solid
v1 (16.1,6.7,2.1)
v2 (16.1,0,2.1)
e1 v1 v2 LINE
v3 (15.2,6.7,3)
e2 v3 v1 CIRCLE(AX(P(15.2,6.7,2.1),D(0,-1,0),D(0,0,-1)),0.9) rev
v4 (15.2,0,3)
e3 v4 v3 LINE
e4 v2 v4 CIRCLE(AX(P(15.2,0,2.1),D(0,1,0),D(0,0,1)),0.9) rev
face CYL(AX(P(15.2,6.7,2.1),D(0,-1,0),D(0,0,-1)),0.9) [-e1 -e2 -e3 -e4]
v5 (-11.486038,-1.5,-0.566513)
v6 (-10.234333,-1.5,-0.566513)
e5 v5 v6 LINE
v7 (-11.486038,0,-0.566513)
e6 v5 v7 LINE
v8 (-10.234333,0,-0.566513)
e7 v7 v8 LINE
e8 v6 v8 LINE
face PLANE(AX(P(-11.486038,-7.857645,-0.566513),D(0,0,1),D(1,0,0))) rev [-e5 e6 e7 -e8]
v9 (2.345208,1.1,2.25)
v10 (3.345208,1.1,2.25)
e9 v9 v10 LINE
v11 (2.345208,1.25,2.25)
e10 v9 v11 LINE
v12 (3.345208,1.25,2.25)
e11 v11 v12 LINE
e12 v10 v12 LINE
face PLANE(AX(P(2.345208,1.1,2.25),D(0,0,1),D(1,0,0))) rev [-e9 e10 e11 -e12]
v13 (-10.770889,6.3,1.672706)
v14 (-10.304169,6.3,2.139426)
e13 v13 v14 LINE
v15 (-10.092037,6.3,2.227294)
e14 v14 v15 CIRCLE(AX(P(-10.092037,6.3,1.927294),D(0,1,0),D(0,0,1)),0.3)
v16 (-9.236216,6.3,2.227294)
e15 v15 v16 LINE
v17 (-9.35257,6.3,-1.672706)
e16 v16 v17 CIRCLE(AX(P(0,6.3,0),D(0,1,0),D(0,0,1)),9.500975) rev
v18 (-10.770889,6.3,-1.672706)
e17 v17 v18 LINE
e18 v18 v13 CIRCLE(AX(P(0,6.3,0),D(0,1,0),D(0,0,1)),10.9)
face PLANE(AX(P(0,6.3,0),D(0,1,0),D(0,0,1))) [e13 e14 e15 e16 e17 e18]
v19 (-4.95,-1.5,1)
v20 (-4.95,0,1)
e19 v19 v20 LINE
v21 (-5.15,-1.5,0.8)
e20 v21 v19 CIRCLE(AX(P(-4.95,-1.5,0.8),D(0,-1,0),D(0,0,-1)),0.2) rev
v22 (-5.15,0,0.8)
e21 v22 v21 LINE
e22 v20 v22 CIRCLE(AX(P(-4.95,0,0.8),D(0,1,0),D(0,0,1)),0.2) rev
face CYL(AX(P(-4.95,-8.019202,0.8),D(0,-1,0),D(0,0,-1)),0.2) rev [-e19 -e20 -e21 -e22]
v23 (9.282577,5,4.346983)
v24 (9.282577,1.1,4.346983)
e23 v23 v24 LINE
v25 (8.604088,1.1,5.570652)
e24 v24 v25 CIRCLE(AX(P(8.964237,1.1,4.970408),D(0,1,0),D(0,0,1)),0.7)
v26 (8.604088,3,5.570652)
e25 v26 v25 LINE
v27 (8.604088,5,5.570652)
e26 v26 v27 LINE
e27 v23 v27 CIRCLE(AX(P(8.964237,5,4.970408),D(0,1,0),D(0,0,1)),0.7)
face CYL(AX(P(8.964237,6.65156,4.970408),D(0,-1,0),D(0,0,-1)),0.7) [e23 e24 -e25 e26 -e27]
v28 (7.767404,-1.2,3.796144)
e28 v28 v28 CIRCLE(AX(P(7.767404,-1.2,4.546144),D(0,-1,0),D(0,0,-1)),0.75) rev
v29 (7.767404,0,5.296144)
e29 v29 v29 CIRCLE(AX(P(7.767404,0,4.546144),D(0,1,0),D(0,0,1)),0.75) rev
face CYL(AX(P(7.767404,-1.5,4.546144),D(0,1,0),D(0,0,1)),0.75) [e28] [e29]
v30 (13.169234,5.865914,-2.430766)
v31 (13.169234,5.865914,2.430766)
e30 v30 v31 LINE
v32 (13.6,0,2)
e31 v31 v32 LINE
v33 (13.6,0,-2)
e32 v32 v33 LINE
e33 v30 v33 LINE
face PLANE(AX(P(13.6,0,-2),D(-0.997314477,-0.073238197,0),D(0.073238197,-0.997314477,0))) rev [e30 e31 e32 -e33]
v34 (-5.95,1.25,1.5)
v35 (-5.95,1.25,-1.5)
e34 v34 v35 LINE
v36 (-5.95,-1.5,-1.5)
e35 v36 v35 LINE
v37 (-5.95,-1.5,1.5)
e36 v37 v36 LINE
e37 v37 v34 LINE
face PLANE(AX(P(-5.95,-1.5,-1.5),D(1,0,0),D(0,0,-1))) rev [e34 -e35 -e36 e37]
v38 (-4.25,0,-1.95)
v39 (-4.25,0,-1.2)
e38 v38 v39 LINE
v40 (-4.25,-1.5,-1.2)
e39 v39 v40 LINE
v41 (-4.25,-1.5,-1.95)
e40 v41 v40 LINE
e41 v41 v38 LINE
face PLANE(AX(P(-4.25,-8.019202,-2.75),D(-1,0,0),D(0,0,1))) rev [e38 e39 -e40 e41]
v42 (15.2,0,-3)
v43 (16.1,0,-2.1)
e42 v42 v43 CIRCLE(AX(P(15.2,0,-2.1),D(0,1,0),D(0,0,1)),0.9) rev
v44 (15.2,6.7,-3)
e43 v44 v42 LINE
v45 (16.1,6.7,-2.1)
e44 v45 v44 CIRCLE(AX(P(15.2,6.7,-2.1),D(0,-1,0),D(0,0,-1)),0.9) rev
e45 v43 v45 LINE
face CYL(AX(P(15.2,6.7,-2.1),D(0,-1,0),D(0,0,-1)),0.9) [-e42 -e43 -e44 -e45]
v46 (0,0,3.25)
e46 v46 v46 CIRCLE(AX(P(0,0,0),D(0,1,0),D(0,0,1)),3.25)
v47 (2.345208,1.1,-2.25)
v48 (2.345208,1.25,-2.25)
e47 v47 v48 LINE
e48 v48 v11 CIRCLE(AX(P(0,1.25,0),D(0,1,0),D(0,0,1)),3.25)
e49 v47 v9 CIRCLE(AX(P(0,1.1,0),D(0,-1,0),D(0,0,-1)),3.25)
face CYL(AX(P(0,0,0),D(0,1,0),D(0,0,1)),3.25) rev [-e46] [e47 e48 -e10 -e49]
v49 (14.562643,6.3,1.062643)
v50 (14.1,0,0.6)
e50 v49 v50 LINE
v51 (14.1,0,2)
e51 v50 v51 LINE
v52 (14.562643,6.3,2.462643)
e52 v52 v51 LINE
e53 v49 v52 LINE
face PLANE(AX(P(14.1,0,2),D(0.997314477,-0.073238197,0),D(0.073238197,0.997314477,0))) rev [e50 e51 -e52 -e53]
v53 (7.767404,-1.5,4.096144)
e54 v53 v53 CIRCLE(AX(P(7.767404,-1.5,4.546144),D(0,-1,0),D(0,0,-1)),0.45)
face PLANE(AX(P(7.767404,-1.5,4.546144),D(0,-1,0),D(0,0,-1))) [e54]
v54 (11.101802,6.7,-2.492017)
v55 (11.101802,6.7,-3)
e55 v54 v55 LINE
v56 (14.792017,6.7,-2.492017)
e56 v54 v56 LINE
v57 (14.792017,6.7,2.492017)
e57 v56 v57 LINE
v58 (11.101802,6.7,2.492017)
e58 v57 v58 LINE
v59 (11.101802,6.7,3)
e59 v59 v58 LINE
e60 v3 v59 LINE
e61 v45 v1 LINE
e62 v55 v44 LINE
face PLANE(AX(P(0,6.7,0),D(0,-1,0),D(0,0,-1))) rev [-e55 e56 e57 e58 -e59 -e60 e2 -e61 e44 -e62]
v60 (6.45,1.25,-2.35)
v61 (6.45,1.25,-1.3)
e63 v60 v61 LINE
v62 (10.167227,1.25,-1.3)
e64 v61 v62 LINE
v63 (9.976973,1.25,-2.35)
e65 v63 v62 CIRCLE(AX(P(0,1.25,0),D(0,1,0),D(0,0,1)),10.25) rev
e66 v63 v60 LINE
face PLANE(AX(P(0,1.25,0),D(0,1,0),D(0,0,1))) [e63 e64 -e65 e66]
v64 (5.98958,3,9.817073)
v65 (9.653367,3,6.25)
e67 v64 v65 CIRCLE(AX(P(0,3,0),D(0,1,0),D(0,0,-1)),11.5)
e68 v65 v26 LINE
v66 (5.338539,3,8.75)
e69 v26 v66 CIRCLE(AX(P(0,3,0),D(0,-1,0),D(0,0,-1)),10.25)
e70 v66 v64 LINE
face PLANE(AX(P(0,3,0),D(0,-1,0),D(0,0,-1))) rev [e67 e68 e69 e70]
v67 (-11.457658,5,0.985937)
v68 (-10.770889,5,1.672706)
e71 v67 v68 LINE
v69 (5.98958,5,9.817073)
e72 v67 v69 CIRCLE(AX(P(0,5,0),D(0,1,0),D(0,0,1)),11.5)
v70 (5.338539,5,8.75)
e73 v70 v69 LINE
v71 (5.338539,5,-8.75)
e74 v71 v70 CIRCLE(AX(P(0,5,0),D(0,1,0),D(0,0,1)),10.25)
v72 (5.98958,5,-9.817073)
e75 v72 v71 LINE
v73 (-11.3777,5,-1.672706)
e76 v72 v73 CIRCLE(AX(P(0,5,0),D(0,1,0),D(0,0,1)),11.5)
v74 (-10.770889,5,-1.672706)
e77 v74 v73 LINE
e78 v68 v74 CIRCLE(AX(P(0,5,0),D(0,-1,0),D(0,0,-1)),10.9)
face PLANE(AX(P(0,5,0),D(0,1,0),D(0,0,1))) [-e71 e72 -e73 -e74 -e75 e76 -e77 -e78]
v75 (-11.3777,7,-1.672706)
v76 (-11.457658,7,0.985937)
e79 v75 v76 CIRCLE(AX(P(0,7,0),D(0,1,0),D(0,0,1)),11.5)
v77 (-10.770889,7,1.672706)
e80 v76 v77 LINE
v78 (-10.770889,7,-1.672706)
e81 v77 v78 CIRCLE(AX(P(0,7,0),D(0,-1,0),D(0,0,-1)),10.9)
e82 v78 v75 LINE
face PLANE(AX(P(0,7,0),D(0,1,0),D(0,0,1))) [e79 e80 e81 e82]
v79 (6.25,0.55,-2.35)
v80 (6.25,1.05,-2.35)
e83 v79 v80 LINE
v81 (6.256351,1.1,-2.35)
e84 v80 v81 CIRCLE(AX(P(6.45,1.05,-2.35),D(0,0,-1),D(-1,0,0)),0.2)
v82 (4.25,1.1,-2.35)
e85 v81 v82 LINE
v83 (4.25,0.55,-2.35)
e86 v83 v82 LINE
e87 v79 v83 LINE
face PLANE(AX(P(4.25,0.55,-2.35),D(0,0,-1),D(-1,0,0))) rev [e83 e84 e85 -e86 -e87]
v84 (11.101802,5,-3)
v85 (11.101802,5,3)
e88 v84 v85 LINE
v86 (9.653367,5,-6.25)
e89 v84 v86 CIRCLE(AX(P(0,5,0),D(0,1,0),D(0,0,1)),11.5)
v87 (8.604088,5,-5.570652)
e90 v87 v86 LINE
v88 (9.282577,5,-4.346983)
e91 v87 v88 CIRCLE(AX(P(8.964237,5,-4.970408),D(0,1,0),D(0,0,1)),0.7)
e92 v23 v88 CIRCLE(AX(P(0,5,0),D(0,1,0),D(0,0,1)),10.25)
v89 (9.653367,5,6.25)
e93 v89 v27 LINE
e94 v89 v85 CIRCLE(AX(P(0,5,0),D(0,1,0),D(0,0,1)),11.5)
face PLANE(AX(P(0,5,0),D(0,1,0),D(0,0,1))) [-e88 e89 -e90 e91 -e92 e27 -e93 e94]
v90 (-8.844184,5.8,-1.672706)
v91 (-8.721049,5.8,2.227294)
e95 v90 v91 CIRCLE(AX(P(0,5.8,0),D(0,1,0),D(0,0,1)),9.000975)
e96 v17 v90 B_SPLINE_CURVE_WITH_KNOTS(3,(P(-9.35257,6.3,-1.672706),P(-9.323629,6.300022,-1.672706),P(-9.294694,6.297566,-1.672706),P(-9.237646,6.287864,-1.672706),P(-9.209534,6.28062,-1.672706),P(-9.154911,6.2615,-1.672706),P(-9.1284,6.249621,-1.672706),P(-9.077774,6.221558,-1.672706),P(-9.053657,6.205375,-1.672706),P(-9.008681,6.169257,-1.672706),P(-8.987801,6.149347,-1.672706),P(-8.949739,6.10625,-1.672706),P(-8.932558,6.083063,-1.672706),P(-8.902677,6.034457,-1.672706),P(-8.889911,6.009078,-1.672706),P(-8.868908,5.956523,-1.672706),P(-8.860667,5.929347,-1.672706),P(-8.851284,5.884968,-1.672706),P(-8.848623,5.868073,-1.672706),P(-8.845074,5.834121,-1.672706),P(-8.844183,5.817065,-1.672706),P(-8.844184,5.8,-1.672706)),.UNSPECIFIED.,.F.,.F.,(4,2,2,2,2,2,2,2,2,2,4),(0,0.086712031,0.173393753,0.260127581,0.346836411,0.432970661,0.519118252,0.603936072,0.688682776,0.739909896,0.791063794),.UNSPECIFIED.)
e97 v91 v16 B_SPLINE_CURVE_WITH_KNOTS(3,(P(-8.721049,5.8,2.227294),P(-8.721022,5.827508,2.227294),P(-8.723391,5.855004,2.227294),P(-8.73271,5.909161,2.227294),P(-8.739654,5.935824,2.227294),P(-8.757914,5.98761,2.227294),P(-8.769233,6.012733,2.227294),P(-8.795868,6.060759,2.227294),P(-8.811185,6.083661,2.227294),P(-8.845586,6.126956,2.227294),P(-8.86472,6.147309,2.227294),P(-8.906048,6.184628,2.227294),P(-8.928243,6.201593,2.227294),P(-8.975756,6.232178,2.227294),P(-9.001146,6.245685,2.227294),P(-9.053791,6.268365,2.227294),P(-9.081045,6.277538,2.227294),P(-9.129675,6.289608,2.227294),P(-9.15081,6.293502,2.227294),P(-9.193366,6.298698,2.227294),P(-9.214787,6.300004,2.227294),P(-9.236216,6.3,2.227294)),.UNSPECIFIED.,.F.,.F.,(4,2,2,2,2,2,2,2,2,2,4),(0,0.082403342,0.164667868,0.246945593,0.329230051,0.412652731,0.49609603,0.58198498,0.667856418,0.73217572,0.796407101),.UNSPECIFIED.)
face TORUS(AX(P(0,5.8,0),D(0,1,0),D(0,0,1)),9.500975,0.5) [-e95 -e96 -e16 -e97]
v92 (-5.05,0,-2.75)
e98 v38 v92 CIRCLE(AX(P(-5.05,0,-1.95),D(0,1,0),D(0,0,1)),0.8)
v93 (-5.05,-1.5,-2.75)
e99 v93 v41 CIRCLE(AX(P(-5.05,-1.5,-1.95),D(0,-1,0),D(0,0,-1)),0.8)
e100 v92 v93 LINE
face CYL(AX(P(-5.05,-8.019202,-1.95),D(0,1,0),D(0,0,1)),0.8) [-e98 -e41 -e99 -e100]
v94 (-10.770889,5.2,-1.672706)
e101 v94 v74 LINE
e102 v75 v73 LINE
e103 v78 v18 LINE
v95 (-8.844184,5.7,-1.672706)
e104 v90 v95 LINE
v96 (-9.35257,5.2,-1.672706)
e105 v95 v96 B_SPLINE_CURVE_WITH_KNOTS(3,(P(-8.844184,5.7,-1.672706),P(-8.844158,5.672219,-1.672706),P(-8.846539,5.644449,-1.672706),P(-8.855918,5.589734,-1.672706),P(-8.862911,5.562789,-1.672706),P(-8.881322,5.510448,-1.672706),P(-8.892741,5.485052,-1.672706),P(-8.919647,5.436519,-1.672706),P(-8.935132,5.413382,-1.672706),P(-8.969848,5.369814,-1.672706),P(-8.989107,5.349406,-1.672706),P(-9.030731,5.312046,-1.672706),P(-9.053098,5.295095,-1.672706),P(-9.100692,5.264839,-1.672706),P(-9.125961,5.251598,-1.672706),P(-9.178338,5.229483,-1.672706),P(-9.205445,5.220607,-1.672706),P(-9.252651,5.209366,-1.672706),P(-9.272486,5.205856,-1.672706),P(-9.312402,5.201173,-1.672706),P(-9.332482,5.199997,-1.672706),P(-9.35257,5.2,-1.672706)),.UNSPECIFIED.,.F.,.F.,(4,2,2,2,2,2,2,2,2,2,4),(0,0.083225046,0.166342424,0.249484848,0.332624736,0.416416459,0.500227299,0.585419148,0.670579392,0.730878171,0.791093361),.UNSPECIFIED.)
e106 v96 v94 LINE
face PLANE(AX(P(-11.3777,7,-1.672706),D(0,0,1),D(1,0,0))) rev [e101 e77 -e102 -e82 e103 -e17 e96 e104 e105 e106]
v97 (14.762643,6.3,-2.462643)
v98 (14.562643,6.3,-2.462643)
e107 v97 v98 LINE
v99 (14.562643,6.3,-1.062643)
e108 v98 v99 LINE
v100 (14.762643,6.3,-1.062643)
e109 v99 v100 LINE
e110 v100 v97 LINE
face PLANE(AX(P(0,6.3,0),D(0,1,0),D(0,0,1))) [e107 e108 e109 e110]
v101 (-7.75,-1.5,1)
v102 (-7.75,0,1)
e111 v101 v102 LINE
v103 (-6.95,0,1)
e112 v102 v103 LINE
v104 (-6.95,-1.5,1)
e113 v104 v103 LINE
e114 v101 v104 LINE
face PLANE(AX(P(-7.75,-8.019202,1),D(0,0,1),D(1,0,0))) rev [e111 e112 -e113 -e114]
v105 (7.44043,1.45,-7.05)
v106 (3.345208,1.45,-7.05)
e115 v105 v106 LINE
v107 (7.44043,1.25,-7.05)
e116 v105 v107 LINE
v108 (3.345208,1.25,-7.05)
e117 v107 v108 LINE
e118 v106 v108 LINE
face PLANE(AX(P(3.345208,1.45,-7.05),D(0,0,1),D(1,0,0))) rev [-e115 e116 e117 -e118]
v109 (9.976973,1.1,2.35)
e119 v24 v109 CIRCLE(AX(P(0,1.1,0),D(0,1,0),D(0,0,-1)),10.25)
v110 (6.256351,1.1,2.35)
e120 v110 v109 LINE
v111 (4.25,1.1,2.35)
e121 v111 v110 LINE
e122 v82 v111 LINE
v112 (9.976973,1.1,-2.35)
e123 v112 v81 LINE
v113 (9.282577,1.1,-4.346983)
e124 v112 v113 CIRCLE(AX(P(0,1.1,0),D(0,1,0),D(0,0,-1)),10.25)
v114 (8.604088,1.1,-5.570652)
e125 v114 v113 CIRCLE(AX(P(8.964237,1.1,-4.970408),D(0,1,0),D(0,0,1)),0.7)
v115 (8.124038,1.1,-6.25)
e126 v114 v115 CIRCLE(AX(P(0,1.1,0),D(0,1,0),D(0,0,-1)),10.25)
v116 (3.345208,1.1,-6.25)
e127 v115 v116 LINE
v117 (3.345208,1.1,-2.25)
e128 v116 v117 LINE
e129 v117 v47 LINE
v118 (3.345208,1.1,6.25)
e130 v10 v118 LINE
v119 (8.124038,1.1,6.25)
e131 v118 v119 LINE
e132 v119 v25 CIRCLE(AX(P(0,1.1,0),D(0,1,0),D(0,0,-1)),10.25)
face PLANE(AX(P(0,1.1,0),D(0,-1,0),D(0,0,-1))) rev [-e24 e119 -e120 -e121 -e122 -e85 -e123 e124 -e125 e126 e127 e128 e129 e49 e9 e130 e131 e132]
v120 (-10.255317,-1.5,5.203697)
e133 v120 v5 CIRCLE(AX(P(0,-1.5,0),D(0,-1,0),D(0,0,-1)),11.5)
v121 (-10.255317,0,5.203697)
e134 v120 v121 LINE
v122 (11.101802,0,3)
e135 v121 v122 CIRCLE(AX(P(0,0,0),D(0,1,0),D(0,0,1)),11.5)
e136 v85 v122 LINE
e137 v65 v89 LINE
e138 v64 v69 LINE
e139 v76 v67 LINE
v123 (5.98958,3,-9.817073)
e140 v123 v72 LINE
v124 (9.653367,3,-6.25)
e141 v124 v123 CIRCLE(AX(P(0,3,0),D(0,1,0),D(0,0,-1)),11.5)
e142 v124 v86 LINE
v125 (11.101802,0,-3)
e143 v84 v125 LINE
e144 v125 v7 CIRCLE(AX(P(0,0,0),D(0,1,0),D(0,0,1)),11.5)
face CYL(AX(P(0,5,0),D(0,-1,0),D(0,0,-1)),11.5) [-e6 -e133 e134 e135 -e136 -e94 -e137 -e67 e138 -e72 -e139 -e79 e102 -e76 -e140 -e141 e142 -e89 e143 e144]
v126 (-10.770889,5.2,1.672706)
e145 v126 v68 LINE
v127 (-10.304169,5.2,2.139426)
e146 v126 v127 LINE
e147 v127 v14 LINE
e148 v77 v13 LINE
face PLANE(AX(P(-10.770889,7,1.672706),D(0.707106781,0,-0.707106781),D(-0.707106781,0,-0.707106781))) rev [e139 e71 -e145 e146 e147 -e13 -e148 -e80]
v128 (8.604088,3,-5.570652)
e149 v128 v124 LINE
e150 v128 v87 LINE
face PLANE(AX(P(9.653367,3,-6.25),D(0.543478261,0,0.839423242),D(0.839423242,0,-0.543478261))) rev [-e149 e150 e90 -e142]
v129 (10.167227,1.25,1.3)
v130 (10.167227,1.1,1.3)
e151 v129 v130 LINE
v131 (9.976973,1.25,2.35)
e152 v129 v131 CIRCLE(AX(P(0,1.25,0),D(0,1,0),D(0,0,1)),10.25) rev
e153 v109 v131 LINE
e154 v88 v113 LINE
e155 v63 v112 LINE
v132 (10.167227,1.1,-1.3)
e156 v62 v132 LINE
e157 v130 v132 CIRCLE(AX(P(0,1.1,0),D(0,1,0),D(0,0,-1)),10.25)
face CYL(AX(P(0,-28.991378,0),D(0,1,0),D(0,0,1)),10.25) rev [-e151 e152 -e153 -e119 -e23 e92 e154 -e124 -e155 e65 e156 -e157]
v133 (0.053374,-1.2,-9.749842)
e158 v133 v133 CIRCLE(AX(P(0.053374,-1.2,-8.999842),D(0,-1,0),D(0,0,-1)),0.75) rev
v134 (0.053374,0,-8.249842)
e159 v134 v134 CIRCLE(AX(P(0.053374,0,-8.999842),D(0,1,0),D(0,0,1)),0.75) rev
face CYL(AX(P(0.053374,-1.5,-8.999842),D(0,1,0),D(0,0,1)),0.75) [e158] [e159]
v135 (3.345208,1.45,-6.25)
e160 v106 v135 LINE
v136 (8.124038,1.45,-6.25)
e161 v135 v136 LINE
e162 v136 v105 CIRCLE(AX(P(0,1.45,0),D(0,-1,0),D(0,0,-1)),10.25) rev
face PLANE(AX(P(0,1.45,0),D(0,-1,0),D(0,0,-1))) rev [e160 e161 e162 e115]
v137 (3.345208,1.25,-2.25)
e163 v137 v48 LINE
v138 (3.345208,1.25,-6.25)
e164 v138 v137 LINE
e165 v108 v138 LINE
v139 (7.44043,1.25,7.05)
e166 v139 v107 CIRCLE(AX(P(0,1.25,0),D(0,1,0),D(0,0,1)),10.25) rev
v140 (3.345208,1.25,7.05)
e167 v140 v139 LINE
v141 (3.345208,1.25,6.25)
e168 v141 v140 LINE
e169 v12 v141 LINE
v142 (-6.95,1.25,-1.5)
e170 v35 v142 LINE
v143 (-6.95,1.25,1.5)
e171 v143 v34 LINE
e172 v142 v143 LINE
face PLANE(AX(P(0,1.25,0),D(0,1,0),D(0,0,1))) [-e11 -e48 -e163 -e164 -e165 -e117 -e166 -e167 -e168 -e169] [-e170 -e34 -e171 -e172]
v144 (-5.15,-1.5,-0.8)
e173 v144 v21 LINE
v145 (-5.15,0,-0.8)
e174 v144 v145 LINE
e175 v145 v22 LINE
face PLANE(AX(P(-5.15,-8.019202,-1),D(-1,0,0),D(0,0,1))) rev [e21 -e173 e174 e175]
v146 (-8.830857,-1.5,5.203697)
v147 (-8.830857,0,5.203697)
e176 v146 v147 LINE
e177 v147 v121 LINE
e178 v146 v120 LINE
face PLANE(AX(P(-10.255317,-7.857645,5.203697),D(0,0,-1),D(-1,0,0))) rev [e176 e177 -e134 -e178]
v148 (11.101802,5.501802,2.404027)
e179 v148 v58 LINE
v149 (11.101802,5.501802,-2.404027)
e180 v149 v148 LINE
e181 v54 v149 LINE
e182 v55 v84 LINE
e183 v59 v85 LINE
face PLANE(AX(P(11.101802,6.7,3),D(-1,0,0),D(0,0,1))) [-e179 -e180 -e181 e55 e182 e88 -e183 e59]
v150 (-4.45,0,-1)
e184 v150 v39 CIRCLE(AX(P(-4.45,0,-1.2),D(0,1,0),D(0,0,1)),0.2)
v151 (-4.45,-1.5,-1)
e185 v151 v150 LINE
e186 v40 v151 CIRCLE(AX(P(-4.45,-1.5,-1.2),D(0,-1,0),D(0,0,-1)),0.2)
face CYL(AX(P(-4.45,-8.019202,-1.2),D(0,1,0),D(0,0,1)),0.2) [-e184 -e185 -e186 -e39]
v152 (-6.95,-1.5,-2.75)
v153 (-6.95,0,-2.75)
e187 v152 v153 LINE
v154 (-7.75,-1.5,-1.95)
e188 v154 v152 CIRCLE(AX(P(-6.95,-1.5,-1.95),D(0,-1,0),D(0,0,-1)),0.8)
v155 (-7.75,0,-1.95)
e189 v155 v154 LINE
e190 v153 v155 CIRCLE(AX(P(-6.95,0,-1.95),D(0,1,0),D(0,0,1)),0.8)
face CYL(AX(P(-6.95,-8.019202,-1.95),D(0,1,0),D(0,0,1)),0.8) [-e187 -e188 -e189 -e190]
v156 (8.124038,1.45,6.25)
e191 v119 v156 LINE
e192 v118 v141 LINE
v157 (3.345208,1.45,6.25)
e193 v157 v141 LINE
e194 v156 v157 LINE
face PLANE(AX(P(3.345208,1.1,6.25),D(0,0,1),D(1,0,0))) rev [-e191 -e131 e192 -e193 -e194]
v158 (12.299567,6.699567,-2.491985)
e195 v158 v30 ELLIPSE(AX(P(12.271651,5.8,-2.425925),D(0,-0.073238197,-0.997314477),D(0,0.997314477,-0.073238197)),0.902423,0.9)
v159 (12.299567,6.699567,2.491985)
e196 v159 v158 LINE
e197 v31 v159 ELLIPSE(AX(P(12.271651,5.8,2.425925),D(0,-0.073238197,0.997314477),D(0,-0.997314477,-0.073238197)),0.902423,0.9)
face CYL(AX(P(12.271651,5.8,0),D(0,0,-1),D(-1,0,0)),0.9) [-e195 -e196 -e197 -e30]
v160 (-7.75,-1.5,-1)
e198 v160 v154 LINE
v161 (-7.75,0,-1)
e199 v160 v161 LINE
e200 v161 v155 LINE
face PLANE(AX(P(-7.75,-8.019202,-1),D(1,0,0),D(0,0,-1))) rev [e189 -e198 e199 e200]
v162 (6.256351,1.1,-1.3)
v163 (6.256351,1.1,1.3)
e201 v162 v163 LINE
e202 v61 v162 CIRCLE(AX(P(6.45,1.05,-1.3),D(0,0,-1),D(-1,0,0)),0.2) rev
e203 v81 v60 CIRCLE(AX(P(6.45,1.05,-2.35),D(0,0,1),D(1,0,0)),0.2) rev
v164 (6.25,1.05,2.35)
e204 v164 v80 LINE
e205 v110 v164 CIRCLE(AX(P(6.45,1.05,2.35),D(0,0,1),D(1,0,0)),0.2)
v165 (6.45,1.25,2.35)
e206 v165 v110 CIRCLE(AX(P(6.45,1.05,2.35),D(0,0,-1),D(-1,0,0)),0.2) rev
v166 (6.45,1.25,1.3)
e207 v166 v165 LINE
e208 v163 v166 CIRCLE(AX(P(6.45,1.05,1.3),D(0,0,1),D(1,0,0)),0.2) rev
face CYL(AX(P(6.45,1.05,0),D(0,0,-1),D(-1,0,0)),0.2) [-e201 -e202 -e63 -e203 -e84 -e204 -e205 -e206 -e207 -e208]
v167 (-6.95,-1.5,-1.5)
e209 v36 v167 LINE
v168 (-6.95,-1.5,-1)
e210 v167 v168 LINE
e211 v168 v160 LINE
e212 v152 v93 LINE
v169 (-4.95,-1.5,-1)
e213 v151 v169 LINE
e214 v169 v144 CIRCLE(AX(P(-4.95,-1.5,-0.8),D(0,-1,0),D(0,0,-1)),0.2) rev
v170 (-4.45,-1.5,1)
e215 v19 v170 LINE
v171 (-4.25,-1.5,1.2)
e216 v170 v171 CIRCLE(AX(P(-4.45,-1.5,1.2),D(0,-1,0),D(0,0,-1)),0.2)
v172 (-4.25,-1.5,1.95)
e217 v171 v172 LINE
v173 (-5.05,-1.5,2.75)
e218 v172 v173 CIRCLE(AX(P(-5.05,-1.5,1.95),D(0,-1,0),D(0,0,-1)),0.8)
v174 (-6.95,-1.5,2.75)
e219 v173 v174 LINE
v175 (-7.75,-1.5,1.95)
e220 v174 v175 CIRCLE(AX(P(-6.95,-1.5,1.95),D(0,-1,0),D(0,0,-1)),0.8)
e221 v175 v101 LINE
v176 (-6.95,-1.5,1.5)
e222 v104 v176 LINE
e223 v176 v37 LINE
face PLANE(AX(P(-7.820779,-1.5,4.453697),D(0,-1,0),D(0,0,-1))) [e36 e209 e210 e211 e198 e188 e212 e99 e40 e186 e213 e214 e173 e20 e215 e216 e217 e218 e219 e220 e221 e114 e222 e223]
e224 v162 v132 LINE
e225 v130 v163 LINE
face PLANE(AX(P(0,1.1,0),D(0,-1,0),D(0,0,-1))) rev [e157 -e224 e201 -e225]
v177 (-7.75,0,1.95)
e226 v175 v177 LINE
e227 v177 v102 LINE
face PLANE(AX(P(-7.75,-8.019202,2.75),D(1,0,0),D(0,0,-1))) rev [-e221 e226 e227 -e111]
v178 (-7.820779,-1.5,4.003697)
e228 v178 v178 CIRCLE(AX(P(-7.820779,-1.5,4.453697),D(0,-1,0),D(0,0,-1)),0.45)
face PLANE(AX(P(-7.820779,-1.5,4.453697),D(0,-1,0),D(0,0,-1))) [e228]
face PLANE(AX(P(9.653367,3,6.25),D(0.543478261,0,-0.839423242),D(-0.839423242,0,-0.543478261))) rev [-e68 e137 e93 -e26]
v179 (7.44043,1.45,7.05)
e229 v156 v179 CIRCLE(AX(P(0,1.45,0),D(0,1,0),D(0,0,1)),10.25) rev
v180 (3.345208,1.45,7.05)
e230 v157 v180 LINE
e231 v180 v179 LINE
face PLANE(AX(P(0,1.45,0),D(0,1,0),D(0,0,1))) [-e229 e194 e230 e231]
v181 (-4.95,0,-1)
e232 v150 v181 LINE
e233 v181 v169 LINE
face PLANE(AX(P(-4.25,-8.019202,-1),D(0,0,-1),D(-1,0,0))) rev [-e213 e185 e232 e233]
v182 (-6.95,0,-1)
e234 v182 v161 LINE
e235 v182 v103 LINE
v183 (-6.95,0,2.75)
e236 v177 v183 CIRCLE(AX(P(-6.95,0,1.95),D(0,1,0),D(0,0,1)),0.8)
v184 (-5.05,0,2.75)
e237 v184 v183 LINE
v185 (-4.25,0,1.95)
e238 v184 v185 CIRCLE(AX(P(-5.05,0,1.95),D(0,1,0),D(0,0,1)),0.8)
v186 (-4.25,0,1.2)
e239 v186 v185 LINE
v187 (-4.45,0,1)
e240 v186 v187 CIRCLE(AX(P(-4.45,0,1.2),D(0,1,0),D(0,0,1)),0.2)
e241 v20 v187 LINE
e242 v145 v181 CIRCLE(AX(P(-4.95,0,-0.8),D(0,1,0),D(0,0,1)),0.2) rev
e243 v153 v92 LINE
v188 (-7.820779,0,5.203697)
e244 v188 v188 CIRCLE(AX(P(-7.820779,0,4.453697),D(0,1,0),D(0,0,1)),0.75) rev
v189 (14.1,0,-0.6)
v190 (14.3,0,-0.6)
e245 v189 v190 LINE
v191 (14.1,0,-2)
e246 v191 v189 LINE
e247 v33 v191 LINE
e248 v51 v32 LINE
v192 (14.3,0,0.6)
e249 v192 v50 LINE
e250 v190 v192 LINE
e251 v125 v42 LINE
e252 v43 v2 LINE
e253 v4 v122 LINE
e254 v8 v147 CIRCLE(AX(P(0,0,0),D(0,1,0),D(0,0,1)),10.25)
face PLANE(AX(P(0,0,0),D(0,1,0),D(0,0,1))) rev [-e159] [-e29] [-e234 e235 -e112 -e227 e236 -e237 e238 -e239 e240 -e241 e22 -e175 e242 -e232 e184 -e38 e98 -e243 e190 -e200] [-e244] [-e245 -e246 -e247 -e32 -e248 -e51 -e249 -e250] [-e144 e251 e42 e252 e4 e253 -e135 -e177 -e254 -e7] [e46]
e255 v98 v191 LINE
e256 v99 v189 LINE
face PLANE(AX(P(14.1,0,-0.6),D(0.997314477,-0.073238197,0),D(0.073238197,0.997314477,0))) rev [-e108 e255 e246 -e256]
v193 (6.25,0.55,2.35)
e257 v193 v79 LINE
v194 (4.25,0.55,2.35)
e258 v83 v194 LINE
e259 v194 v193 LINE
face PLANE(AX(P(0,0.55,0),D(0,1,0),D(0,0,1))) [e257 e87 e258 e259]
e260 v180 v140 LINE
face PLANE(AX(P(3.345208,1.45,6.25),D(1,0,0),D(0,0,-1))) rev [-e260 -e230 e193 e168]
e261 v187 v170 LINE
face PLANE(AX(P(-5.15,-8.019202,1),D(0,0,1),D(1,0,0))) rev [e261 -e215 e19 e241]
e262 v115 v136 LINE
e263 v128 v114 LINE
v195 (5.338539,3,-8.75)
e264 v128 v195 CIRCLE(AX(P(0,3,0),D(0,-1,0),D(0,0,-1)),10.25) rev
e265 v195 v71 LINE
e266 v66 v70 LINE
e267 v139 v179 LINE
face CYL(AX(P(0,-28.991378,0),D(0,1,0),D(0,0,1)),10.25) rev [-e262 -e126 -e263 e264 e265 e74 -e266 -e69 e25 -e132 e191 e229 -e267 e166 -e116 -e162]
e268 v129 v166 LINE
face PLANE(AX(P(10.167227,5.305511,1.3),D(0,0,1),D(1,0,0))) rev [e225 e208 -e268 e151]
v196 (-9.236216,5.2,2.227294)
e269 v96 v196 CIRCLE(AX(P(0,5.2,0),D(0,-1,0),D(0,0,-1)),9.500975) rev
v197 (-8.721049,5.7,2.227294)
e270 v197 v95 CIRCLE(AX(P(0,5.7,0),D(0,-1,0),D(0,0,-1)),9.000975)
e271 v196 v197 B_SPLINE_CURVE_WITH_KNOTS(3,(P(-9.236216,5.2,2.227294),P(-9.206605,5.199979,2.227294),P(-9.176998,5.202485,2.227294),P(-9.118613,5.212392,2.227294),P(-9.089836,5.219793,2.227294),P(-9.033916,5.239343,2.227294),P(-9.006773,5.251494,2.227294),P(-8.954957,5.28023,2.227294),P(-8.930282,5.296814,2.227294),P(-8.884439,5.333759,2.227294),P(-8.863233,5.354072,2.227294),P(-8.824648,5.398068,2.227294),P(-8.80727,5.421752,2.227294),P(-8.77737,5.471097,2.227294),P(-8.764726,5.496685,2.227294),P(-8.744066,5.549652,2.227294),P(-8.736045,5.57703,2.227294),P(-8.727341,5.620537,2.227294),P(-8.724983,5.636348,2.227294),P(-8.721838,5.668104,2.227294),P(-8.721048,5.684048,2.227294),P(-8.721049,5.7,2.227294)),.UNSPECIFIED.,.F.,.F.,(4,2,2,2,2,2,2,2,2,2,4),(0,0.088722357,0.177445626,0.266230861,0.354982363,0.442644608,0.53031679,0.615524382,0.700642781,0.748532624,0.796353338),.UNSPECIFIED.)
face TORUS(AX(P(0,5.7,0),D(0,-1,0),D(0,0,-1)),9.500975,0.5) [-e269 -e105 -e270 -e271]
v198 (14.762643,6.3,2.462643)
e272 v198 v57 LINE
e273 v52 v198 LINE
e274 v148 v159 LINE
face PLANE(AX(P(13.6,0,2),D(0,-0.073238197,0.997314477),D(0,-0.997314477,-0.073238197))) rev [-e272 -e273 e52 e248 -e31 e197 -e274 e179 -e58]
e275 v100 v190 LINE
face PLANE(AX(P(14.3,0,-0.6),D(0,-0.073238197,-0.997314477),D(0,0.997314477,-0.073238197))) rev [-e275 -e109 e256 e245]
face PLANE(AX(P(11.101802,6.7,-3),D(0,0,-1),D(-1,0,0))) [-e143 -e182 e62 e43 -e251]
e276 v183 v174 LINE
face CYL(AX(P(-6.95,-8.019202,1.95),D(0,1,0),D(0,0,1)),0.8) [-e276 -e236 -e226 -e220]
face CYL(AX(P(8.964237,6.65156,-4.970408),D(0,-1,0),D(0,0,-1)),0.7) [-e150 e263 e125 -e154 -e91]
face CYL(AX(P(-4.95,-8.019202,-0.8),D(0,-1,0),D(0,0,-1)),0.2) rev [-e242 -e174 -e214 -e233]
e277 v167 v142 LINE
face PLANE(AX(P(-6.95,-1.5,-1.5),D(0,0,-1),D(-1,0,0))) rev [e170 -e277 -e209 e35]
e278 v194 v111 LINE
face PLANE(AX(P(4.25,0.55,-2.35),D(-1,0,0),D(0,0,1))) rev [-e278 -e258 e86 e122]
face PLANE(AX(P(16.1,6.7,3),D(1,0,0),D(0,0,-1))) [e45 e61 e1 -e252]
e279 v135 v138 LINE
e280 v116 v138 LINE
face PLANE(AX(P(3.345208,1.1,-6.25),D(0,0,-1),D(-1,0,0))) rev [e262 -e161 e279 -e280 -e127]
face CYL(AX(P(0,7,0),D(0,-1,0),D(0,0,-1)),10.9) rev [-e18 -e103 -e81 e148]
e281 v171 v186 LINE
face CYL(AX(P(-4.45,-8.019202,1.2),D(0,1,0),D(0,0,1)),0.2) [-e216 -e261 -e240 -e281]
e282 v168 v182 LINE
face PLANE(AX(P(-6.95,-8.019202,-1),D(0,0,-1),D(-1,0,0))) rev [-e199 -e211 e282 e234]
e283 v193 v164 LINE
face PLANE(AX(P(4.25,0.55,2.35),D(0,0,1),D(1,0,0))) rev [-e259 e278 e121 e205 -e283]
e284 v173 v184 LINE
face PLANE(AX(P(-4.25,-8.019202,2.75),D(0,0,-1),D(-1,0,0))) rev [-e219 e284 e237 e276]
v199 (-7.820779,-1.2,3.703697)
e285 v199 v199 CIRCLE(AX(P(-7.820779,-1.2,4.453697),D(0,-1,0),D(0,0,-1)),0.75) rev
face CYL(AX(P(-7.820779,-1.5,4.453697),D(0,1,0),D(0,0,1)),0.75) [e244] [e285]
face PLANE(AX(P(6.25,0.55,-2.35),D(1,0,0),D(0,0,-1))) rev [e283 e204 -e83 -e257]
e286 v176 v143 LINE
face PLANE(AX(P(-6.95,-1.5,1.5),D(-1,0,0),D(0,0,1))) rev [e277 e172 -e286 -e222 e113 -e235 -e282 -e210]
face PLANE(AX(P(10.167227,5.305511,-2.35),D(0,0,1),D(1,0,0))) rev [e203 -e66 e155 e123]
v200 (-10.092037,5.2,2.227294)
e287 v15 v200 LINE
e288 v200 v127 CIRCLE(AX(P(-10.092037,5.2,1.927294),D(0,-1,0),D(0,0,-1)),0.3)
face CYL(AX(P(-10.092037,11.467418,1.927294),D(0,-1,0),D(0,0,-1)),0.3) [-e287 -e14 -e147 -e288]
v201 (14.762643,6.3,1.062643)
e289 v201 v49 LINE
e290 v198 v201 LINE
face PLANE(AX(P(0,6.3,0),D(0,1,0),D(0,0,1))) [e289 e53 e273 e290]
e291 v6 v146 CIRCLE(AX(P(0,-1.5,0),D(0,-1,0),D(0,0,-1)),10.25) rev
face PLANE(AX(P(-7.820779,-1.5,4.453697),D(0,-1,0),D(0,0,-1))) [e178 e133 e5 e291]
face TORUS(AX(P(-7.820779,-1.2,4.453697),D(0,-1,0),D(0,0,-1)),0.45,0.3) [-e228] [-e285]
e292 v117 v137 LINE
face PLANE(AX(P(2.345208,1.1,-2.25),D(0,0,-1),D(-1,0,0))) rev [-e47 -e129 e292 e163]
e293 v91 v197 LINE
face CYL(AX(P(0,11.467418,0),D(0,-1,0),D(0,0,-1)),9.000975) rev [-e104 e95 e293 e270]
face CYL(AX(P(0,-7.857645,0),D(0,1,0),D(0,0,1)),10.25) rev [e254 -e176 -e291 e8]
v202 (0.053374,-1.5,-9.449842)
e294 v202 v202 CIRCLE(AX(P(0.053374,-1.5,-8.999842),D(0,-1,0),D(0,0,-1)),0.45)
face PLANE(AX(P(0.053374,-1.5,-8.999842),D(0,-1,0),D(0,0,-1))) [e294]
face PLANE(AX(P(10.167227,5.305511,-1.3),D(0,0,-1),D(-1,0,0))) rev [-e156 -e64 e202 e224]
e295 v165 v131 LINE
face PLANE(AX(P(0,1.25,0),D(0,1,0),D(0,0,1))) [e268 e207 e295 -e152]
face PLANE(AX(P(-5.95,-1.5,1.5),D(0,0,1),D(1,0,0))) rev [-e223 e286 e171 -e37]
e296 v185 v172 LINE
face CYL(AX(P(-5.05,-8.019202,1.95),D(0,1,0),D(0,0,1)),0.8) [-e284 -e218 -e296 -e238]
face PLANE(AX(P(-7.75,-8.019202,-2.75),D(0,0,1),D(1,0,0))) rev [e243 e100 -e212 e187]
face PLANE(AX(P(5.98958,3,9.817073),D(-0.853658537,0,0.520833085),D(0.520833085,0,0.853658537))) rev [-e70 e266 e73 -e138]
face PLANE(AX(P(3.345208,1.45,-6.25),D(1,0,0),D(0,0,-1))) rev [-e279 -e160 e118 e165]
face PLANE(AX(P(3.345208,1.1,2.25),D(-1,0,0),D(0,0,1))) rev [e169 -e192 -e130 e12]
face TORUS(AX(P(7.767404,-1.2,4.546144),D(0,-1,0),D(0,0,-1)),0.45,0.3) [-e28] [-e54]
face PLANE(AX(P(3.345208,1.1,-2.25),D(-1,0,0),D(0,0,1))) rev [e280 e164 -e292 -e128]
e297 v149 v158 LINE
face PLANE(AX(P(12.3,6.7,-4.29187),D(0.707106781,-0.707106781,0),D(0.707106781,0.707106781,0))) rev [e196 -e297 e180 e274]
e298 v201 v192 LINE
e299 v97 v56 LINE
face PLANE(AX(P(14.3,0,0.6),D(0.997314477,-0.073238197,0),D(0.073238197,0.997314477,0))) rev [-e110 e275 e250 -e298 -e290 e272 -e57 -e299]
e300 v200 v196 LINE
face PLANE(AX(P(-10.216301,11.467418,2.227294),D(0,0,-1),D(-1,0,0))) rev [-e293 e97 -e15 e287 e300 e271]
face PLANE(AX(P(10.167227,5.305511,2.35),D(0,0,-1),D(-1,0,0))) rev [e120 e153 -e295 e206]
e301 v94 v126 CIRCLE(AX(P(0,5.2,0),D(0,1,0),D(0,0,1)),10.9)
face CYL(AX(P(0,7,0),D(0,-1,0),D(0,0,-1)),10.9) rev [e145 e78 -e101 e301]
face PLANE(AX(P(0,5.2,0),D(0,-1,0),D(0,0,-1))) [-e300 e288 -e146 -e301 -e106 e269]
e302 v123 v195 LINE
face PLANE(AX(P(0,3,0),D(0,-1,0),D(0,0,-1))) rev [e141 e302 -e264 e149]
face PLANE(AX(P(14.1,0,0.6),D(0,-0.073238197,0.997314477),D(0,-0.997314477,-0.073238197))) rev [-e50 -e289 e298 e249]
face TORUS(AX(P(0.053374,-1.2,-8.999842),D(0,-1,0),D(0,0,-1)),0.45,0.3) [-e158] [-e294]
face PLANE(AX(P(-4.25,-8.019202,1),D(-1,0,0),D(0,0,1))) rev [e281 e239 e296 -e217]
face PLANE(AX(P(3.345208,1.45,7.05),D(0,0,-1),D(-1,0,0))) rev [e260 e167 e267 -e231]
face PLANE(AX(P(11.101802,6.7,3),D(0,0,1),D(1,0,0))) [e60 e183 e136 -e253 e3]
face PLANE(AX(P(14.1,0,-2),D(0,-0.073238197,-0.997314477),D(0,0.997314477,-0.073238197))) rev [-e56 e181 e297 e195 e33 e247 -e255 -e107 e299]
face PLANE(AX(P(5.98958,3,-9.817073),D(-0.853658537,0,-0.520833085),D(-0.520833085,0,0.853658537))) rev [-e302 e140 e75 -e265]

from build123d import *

# Parameters (mm, degrees)
SKETCH3_R                      = 11.5
BOSS_EXTRUDE2_DEPTH            = 5
SKETCH4_R                      = 10.25
CUT_EXTRUDE2_DEPTH             = 3.75
SKETCH5_W                      = 4.998198344
SKETCH5_H                      = 6
BOSS_EXTRUDE3_DEPTH            = 6.7
FILLET1_R                      = 0.9
SKETCH6_R                      = 3.25
CUT_EXTRUDE3_DEPTH             = 21.522244029
CUT_EXTRUDE4_START             = -2
CUT_EXTRUDE4_DEPTH             = 2
SKETCH9_R                      = 0.75
BOSS_EXTRUDE4_DEPTH            = 1.5
FILLET2_R                      = 0.3
BOSS_EXTRUDE5_DEPTH            = 1.5
BOSS_EXTRUDE7_DEPTH            = 2
SKETCH12_W                     = 1
SKETCH12_H                     = 3
CUT_EXTRUDE5_DEPTH             = 21.603943797
BOSS_EXTRUDE8_DEPTH            = 1.5
FILLET3_R                      = 0.8
FILLET4_R                      = 0.2
CUT_EXTRUDE6_DEPTH             = 21.987138919
CUT_EXTRUDE6_TAPER             = -4.2
FILLET5_R                      = 0.9
CUT_EXTRUDE7_REACH             = 22.987
CUT_EXTRUDE7_DIRECTION_2_REACH = 22.987
SKETCH17_W                     = 1.4
SKETCH17_H                     = 4.984034488
CUT_EXTRUDE8_DEPTH             = 0.4
CUT_EXTRUDE8_DRAFT             = -4.2
SKETCH18_W                     = 2
SKETCH18_H                     = 4.7
CUT_EXTRUDE9_DEPTH             = 0.7
CUT_EXTRUDE10_DEPTH            = 0.15
SKETCH20_W                     = 4.778830525
SKETCH20_H                     = 0.8
BOSS_EXTRUDE9_DEPTH            = 0.2
BOSS_EXTRUDE10_DEPTH           = 3.9
SKETCH23_W                     = 3.917226761
SKETCH23_H                     = 1.05
BOSS_EXTRUDE13_DEPTH           = 0.15
FILLET6_START                  = -2.35
FILLET6_DEPTH                  = 4.7
BOSS_EXTRUDE14_START           = 0.2
BOSS_EXTRUDE14_DEPTH           = 1.1
FILLET7_R                      = 0.5
FILLET8_R                      = 0.3


with BuildPart() as part:
    # Sketch3 → Boss-Extrude2 (new body)
    with BuildSketch(Plane(origin=(0, 0, 0), x_dir=(1, 0, 0), z_dir=(0, 1, 0))):
        with Locations(Location((0, 0, 0), (0, 0, 270))):
            Circle(SKETCH3_R)
    extrude(amount=BOSS_EXTRUDE2_DEPTH)

    # Sketch4 → Cut-Extrude2 (cut)
    with BuildSketch(Plane(origin=(0, 5, 0), x_dir=(1, 0, 0), z_dir=(0, 1, 0))):
        with Locations(Location((0, 0, 0), (0, 0, 270))):
            Circle(SKETCH4_R)
    extrude(amount=-CUT_EXTRUDE2_DEPTH, mode=Mode.SUBTRACT)

    # Sketch5 → Boss-Extrude3 (add)
    with BuildSketch(Plane.XZ):
        with Locations((13.600900828, 0)):
            Rectangle(SKETCH5_W, SKETCH5_H)
    extrude(amount=-BOSS_EXTRUDE3_DEPTH)

    # Fillet1
    fillet1_edges = [part.edges().sort_by_distance(p)[0] for p in [
        (16.1, 3.35, 3),
        (16.1, 3.35, -3),
    ]]
    fillet(fillet1_edges, radius=FILLET1_R)

    # Sketch6 → Cut-Extrude3 (cut, through all)
    with BuildSketch(Plane(origin=(0, 1.25, 0), x_dir=(1, 0, 0), z_dir=(0, 1, 0))):
        with Locations(Location((0, 0, 0), (0, 0, 270))):
            Circle(SKETCH6_R)
    extrude(amount=-CUT_EXTRUDE3_DEPTH, mode=Mode.SUBTRACT)

    # Sketch8 → Cut-Extrude4 (cut)
    with BuildSketch(Plane(origin=(0, 5, 0), x_dir=(1, 0, 0), z_dir=(0, 1, 0)).offset(CUT_EXTRUDE4_START)):
        with BuildLine():
            Line((5.989580483, 9.817073171), (5.338539126, 8.75))
            ThreePointArc((5.338539126, 8.75), (7.125536767, 7.318730606), (8.604088235, 5.570652174))
            Line((8.604088235, 5.570652174), (9.653367288, 6.25))
            ThreePointArc((9.653367288, 6.25), (8.022247596, 8.23975385), (5.989580483, 9.817073171))
        make_face()
        with BuildLine():
            Line((9.653367288, -6.25), (8.604088235, -5.570652174))
            ThreePointArc((8.604088235, -5.570652174), (7.150264162, -7.344128431), (5.338539126, -8.75))
            Line((5.338539126, -8.75), (5.989580483, -9.817073171))
            ThreePointArc((5.989580483, -9.817073171), (8.022247596, -8.23975385), (9.653367288, -6.25))
        make_face()
    extrude(amount=CUT_EXTRUDE4_DEPTH, mode=Mode.SUBTRACT)

    # Sketch9 → Boss-Extrude4 (add)
    with BuildSketch(Plane.XZ):
        with Locations(Location((7.76740441, 4.54614438, 0), (0, 0, 90))):
            Circle(SKETCH9_R)
        with Locations(Location((0.053374318, -8.999841731, 0), (0, 0, 90))):
            Circle(SKETCH9_R)
        with Locations(Location((-7.820778728, 4.453697351, 0), (0, 0, 90))):
            Circle(SKETCH9_R)
    extrude(amount=BOSS_EXTRUDE4_DEPTH)

    # Fillet2
    fillet2_edges = [part.edges().sort_by_distance(p)[0] for p in [
        (7.76740441, -1.5, 3.79614438),
        (0.053374318, -1.5, -9.749841731),
        (-7.820778728, -1.5, 3.703697351),
    ]]
    fillet(fillet2_edges, radius=FILLET2_R)

    # Sketch10 → Boss-Extrude5 (add)
    with BuildSketch(Plane.XZ):
        with BuildLine():
            Line((-11.486037743, -0.566512984), (-10.234332564, -0.566512984))
            ThreePointArc((-10.234332564, -0.566512984), (-9.959628222, 2.422458603), (-8.830856917, 5.203697351))
            Line((-8.830856917, 5.203697351), (-10.255317347, 5.203697351))
            ThreePointArc((-10.255317347, 5.203697351), (-11.247020144, 2.39886179), (-11.486037743, -0.566512984))
        make_face()
    extrude(amount=BOSS_EXTRUDE5_DEPTH)

    # Sketch11 → Boss-Extrude7 (add)
    with BuildSketch(Plane(origin=(0, 5, 0), x_dir=(1, 0, 0), z_dir=(0, 1, 0))):
        with BuildLine():
            Line((-11.37769989, 1.672705953), (-10.77088923, 1.672705953))
            ThreePointArc((-10.77088923, 1.672705953), (-10.9, 0), (-10.77088923, -1.672705953))
            Line((-10.77088923, -1.672705953), (-11.457658049, -0.985937134))
            ThreePointArc((-11.457658049, -0.985937134), (-11.494802687, 0.34570389), (-11.37769989, 1.672705953))
        make_face()
    extrude(amount=BOSS_EXTRUDE7_DEPTH)

    # Sketch12 → Cut-Extrude5 (cut, through all)
    with BuildSketch(Plane(origin=(0, 1.25, 0), x_dir=(1, 0, 0), z_dir=(0, 1, 0))):
        with Locations((-6.45, 0)):
            Rectangle(SKETCH12_W, SKETCH12_H)
    extrude(amount=-CUT_EXTRUDE5_DEPTH, mode=Mode.SUBTRACT)

    # Sketch13 → Boss-Extrude8 (add)
    with BuildSketch(Plane.XZ):
        Polygon((-6.95, 1), (-6.95, 1.5), (-5.95, 1.5), (-5.95, -1.5), (-6.95, -1.5), (-6.95, -1), (-7.75, -1), (-7.75, -2.75), (-4.25, -2.75), (-4.25, -1), (-5.15, -1), (-5.15, 1), (-4.25, 1), (-4.25, 2.75), (-7.75, 2.75), (-7.75, 1), align=None)
    extrude(amount=BOSS_EXTRUDE8_DEPTH)

    # Fillet3
    fillet3_edges = [part.edges().sort_by_distance(p)[0] for p in [
        (-7.75, -0.75, -2.75),
        (-4.25, -0.75, -2.75),
        (-4.25, -0.75, 2.75),
        (-7.75, -0.75, 2.75),
    ]]
    fillet(fillet3_edges, radius=FILLET3_R)

    # Fillet4
    fillet4_edges = [part.edges().sort_by_distance(p)[0] for p in [
        (-4.25, -0.75, -1),
        (-5.15, -0.75, -1),
        (-5.15, -0.75, 1),
        (-4.25, -0.75, 1),
    ]]
    fillet(fillet4_edges, radius=FILLET4_R)

    # Sketch14 → Cut-Extrude6 (cut, through all)
    with BuildSketch(Plane.XZ):
        Polygon((14.3, 0.6), (14.1, 0.6), (14.1, 2), (13.6, 2), (13.6, -2), (14.1, -2), (14.1, -0.6), (14.3, -0.6), align=None)
    extrude(amount=-CUT_EXTRUDE6_DEPTH, taper=CUT_EXTRUDE6_TAPER, mode=Mode.SUBTRACT)

    # Fillet5
    fillet5_edges = [part.edges().sort_by_distance(p)[0] for p in [
        (13.107982756, 6.7, 0),
    ]]
    fillet(fillet5_edges, radius=FILLET5_R)

    # Cut-Extrude7: up to this plane
    cut_extrude7_end = Plane(origin=(14.1, 0, -2), z_dir=(0, -0.07323819712763185, -0.9973144772244581))
    # Sketch16 → Cut-Extrude7 (cut, up to the surface)
    with BuildSketch(Plane.XY, mode=Mode.PRIVATE) as cut_extrude7_sk1:
        Polygon((12.3, 6.7), (11.101801656, 5.501801656), (10.901801656, 5.501801656), (10.901801656, 6.7), align=None)
    cut_extrude7_tool1 = split(extrude(cut_extrude7_sk1.sketch, amount=-CUT_EXTRUDE7_REACH, mode=Mode.PRIVATE), bisect_by=cut_extrude7_end, keep=Keep.BOTH, mode=Mode.PRIVATE)
    add(cut_extrude7_tool1.solids().sort_by_distance((11.37621, 6.250619, 0))[0], mode=Mode.SUBTRACT)

    # Cut-Extrude7 direction 2: up to this plane
    cut_extrude7_direction_2_end = Plane(origin=(13.6, 0, 2), z_dir=(0, -0.07323819712763185, 0.9973144772244581))
    # Sketch16 → Cut-Extrude7 direction 2 (cut, up to the surface)
    with BuildSketch(Plane.XY, mode=Mode.PRIVATE) as cut_extrude7_direction_2_sk1:
        Polygon((12.3, 6.7), (11.101801656, 5.501801656), (10.901801656, 5.501801656), (10.901801656, 6.7), align=None)
    cut_extrude7_direction_2_tool1 = split(extrude(cut_extrude7_direction_2_sk1.sketch, amount=CUT_EXTRUDE7_DIRECTION_2_REACH, mode=Mode.PRIVATE), bisect_by=cut_extrude7_direction_2_end, keep=Keep.BOTH, mode=Mode.PRIVATE)
    add(cut_extrude7_direction_2_tool1.solids().sort_by_distance((11.37621, 6.250619, 0))[0], mode=Mode.SUBTRACT)


with BuildPart() as cut_extrude8_tool:
    # Sketch17 → Cut-Extrude8 (with draft: the straight prism first)
    with BuildSketch(Plane(origin=(0, 6.7, 0), x_dir=(1, 0, 0), z_dir=(0, 1, 0))):
        with Locations((14.092017244, 0)):
            Rectangle(SKETCH17_W, SKETCH17_H)
    extrude(amount=-CUT_EXTRUDE8_DEPTH)
    # Cut-Extrude8: the draft: its side faces are tilted about the plane it starts from
    cut_extrude8_sides = [cut_extrude8_tool.faces().sort_by_distance(p)[0] for p in [
        (13.392017244, 6.5, 0),
        (14.092017244, 6.5, 2.492017244),
        (14.792017244, 6.5, 0),
        (14.092017244, 6.5, -2.492017244),
    ]]
    draft(cut_extrude8_sides, Plane(origin=(0, 6.7, 0), x_dir=(1, 0, 0), z_dir=(0, 1, 0)), CUT_EXTRUDE8_DRAFT)


with BuildPart() as part_1:
    add(part.part)

    # Cut-Extrude8: cut by cut_extrude8_tool
    add(cut_extrude8_tool.part, mode=Mode.SUBTRACT)

    # Sketch18 → Cut-Extrude9 (cut)
    with BuildSketch(Plane(origin=(0, 1.25, 0), x_dir=(1, 0, 0), z_dir=(0, 1, 0))):
        with Locations((5.25, 0)):
            Rectangle(SKETCH18_W, SKETCH18_H)
    extrude(amount=-CUT_EXTRUDE9_DEPTH, mode=Mode.SUBTRACT)

    # Sketch19 → Cut-Extrude10 (cut)
    with BuildSketch(Plane(origin=(0, 1.25, 0), x_dir=(1, 0, 0), z_dir=(0, 1, 0))):
        with BuildLine():
            Line((2.34520788, 2.25), (3.34520788, 2.25))
            Line((3.34520788, 2.25), (3.34520788, 6.25))
            Line((3.34520788, 6.25), (8.124038405, 6.25))
            ThreePointArc((8.124038405, 6.25), (10.25, 0), (8.124038405, -6.25))
            Line((8.124038405, -6.25), (3.34520788, -6.25))
            Line((3.34520788, -6.25), (3.34520788, -2.25))
            Line((3.34520788, -2.25), (2.34520788, -2.25))
            ThreePointArc((2.34520788, -2.25), (3.25, 0), (2.34520788, 2.25))
        make_face()
    extrude(amount=-CUT_EXTRUDE10_DEPTH, mode=Mode.SUBTRACT)

    # Sketch20 → Boss-Extrude9 (add)
    with BuildSketch(Plane(origin=(0, 1.25, 0), x_dir=(1, 0, 0), z_dir=(0, 1, 0))):
        with Locations((5.734623143, 6.65)):
            Rectangle(SKETCH20_W, SKETCH20_H)
        with Locations((5.734623143, -6.65)):
            Rectangle(SKETCH20_W, SKETCH20_H)
    extrude(amount=BOSS_EXTRUDE9_DEPTH)

    # Sketch21 → Boss-Extrude10 (add)
    with BuildSketch(Plane(origin=(0, 1.1, 0), x_dir=(1, 0, 0), z_dir=(0, 1, 0))):
        with BuildLine():
            ThreePointArc((8.604088235, 5.570652174), (8.352045113, 4.630965604), (9.282577349, 4.346982604))
            ThreePointArc((9.282577349, 4.346982604), (8.964236902, 4.970408109), (8.604088235, 5.570652174))
        make_face()
        with BuildLine():
            ThreePointArc((9.282577349, -4.346982604), (8.352045113, -4.630965604), (8.604088235, -5.570652174))
            ThreePointArc((8.604088235, -5.570652174), (8.964236902, -4.970408109), (9.282577349, -4.346982604))
        make_face()
    extrude(amount=BOSS_EXTRUDE10_DEPTH)

    # Sketch23 → Boss-Extrude13 (add)
    with BuildSketch(Plane(origin=(0, 1.1, 0), x_dir=(1, 0, 0), z_dir=(0, 1, 0))):
        with Locations((8.208613381, 1.825)):
            Rectangle(SKETCH23_W, SKETCH23_H)
        with Locations((8.208613381, -1.825)):
            Rectangle(SKETCH23_W, SKETCH23_H)
    extrude(amount=BOSS_EXTRUDE13_DEPTH)

    # Fillet6: read off the stored shape, not the designer's step
    # Fillet6 outline → Fillet6 (cut)
    with BuildSketch(Plane.XY.offset(FILLET6_START)):
        with BuildLine():
            ThreePointArc((6.25, 1.05), (6.308578644, 1.191421356), (6.45, 1.25))
            Line((6.45, 1.25), (6.25, 1.25))
            Line((6.25, 1.25), (6.25, 1.05))
        make_face()
    extrude(amount=FILLET6_DEPTH, mode=Mode.SUBTRACT)

    # Sketch24 → Boss-Extrude14 (add)
    with BuildSketch(Plane(origin=(0, 5, 0), x_dir=(1, 0, 0), z_dir=(0, 1, 0)).offset(BOSS_EXTRUDE14_START)):
        with BuildLine():
            Line((-10.77088923, 1.672705953), (-8.844184369, 1.672705953))
            ThreePointArc((-8.844184369, 1.672705953), (-8.996491528, -0.284046722), (-8.721049454, -2.227294047))
            Line((-8.721049454, -2.227294047), (-10.216301136, -2.227294047))
            Line((-10.216301136, -2.227294047), (-10.77088923, -1.672705953))
            ThreePointArc((-10.77088923, -1.672705953), (-10.9, 0), (-10.77088923, 1.672705953))
        make_face()
    extrude(amount=BOSS_EXTRUDE14_DEPTH)

    # Fillet7
    fillet7_edges = [part_1.edges().sort_by_distance(p)[0] for p in [
        (-8.996491528, 5.2, 0.284046722),
        (-8.996491528, 6.3, 0.284046722),
    ]]
    fillet(fillet7_edges, radius=FILLET7_R)

    # Fillet8
    fillet8_edges = [part_1.edges().sort_by_distance(p)[0] for p in [
        (-10.216301136, 5.75, 2.227294047),
    ]]
    fillet(fillet8_edges, radius=FILLET8_R)


solid = part_1.part
